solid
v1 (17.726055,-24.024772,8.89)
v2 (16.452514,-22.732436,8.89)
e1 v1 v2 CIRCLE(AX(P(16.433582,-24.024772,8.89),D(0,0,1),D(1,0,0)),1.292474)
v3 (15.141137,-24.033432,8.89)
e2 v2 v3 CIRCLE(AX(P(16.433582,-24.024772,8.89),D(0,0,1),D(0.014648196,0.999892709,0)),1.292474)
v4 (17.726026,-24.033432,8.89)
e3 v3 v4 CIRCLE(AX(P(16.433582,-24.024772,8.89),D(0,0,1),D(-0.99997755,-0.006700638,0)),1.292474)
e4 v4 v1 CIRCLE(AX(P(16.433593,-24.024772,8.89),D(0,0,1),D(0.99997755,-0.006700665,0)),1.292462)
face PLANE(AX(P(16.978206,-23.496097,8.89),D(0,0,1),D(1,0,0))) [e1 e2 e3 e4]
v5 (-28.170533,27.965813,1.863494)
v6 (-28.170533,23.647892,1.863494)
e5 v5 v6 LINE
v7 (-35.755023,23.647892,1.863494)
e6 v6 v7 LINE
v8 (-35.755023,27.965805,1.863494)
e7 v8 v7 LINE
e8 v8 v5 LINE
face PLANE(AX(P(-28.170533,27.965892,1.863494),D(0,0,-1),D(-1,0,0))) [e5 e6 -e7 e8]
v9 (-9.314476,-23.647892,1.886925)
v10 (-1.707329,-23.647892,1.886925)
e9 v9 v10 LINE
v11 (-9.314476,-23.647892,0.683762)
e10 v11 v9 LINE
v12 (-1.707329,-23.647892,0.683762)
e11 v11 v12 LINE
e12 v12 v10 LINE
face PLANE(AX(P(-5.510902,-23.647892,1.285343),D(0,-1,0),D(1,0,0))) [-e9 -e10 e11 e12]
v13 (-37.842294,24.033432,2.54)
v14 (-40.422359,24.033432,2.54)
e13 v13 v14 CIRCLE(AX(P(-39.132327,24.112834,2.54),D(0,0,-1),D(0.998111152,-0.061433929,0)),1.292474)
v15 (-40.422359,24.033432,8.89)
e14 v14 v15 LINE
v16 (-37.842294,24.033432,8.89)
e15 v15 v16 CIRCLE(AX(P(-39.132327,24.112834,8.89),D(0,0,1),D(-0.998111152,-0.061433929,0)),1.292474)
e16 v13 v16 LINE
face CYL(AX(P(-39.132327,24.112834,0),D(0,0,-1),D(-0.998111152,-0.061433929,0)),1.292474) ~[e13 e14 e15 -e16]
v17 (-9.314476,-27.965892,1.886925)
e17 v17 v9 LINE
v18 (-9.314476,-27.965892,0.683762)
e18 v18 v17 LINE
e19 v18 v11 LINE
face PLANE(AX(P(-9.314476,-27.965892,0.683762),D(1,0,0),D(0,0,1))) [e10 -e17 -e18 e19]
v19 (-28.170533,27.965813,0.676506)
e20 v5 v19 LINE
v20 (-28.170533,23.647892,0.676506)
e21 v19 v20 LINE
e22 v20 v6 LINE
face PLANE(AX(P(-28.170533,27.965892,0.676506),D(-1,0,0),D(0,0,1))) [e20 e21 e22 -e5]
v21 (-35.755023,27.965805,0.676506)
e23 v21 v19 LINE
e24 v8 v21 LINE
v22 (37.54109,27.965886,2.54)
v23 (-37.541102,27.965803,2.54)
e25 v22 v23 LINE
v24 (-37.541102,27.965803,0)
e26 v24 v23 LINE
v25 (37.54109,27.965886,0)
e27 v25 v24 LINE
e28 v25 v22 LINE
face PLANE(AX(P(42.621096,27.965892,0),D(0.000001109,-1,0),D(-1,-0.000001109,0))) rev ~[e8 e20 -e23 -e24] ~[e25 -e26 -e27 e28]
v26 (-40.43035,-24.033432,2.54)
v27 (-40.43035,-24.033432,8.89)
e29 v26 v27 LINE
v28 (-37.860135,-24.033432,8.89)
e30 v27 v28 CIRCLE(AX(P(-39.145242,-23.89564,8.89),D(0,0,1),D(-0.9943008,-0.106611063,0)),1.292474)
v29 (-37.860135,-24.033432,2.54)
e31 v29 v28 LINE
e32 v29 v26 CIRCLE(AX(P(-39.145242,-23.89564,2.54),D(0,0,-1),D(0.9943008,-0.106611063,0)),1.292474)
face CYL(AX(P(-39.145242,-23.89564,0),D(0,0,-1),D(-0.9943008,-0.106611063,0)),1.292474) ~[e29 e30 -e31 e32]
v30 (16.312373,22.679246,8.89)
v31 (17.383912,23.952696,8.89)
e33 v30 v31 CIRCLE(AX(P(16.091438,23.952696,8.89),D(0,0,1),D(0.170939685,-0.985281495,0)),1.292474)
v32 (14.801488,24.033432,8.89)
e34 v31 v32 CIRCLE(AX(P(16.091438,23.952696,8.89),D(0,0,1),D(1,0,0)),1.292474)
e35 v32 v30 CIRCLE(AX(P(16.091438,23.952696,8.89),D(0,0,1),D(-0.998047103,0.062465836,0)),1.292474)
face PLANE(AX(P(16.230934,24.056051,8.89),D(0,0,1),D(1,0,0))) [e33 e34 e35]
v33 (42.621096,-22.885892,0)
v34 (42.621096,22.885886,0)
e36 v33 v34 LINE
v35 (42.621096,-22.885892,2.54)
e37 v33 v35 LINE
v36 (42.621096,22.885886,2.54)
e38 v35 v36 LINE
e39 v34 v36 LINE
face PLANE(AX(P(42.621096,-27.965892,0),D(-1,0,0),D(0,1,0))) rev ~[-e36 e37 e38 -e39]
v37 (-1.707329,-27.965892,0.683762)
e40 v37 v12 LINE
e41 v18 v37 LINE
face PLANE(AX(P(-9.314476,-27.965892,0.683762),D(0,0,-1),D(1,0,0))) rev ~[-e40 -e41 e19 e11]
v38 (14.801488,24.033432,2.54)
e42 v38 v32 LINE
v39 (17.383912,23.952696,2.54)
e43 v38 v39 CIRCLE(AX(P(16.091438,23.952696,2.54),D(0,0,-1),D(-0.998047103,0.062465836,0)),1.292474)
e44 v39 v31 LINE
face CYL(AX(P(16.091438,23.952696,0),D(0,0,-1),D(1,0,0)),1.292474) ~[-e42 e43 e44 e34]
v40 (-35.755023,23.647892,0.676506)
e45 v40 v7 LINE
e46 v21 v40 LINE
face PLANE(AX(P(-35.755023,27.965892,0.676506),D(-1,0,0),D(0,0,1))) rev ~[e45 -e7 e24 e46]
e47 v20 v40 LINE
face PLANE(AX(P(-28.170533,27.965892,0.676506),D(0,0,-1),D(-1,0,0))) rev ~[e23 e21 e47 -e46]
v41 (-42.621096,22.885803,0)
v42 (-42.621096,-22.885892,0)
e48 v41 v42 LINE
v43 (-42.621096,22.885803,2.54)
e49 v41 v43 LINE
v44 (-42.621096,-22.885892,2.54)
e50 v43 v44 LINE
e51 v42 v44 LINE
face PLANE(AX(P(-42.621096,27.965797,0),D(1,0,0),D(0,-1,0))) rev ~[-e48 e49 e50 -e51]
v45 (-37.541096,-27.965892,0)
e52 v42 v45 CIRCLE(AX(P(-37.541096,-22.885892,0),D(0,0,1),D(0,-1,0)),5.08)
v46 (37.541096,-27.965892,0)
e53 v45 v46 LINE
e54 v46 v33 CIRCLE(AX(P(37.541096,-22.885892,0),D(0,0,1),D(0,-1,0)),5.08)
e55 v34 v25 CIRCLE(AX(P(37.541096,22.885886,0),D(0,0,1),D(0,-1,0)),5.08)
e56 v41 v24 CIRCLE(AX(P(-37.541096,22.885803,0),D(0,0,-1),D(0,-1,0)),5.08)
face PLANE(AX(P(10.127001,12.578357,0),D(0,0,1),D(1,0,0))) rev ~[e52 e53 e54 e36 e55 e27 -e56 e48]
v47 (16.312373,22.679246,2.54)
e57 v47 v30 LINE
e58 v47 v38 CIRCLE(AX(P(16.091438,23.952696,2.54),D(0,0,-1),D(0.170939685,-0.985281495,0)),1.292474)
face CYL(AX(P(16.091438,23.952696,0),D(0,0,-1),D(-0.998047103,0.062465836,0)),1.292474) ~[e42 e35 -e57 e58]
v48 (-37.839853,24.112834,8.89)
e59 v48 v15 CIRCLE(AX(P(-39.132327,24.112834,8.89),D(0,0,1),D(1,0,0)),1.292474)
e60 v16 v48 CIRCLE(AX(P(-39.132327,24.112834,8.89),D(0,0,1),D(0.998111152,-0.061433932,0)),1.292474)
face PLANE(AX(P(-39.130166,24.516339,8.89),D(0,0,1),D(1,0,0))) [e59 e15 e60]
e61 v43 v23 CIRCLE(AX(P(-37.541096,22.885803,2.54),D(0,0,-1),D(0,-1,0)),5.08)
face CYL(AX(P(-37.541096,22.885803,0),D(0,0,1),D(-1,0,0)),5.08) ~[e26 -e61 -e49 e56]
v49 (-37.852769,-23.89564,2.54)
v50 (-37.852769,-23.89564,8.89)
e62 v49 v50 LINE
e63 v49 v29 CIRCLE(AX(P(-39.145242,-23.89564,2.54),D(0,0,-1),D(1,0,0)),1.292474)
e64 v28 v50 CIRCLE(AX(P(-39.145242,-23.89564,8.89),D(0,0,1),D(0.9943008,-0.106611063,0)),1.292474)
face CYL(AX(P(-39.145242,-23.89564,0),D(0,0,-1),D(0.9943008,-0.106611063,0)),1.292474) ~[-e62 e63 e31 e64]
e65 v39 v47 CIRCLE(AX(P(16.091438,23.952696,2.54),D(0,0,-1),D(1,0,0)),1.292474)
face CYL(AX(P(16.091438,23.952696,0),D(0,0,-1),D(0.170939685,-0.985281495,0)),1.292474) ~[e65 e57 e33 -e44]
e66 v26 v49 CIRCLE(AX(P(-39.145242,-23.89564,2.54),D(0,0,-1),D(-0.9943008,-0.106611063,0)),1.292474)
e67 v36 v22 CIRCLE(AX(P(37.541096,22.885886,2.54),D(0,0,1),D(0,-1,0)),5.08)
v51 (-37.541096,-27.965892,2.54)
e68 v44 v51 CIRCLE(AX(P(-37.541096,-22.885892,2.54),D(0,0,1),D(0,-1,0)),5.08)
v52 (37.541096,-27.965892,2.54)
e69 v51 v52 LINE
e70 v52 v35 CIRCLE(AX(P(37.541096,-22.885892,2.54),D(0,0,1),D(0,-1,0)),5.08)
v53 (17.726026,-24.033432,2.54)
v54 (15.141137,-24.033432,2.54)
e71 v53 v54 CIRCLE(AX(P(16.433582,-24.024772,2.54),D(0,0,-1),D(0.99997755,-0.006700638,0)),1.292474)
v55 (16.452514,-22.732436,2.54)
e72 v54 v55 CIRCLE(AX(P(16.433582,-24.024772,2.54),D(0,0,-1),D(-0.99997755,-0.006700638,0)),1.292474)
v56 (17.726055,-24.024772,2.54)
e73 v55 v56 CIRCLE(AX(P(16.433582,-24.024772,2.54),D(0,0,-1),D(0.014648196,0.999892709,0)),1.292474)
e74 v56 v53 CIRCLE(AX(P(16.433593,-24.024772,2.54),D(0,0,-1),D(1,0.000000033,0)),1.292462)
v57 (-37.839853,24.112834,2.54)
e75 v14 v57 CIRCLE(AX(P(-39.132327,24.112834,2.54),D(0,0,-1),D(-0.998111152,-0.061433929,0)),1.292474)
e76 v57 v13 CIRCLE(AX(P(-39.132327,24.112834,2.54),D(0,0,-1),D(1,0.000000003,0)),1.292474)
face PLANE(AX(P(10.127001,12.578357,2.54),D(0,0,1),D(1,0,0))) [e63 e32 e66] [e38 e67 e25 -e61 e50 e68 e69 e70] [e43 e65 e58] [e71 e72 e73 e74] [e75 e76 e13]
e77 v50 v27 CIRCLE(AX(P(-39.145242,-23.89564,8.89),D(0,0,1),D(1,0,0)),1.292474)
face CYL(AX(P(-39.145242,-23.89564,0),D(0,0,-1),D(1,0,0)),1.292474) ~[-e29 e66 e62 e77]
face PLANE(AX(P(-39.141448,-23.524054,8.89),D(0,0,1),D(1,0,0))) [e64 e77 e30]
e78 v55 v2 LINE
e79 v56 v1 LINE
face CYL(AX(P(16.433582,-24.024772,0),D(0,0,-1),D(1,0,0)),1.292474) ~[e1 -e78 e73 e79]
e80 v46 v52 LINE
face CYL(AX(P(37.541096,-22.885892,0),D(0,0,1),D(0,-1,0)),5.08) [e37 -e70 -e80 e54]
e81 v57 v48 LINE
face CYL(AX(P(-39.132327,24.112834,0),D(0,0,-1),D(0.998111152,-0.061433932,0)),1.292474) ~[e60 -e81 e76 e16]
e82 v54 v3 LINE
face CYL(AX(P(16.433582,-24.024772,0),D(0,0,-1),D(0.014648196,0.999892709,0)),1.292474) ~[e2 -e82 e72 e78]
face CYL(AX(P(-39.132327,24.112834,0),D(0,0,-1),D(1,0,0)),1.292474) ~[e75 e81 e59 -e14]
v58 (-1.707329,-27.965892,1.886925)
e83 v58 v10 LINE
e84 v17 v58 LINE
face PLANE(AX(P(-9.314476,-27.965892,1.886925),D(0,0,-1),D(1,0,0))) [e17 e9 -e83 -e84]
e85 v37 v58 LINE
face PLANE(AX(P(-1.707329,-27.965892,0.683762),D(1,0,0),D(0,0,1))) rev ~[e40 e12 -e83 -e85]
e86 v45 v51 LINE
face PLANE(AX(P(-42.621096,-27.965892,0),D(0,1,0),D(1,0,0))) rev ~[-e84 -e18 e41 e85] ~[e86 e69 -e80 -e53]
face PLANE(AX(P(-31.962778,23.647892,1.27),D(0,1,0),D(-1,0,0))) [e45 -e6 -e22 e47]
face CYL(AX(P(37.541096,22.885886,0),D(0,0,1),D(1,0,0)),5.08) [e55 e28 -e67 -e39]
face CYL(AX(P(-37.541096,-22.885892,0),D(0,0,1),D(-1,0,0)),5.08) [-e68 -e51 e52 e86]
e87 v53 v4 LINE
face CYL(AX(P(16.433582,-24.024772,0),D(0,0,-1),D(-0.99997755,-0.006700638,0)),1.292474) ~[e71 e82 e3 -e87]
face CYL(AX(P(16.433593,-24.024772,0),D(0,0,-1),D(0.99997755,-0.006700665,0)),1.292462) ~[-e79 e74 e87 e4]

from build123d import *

# Parameters (mm, degrees)
F1_DEPTH = 2.54
F2_R     = 5.08
F3_DEPTH = 8.89
F5_W     = 7.6071470976
F5_H     = 1.2031628285
F6_DEPTH = 4.318
F7_W     = 7.584489882
F7_H     = 1.1869876339
F8_DEPTH = 4.318


# Not quite as in the source:
# - ends of sketch curves that miss each other by under 0.0002 mm in the source are joined


with BuildPart() as f1:
    # F0 (on Top) → F1 (new body)
    with BuildSketch(Plane.XY):
        with BuildLine():
            Line((-42.6210959934, 27.9657971114), (-42.6210959934, 24.0334319246))
            Line((-42.6210959934, 24.0334319246), (-40.4223592815, 24.0334319246))
            ThreePointArc((-40.4223592815, 24.0334319246), (-39.1720464715, 25.4046969243), (-37.8398531152, 24.1128336638))
            ThreePointArc((-37.8398531152, 24.1128336638), (-37.8404635808, 24.0731140337), (-37.8422944012, 24.0334319246))
            Line((-37.8422944012, 24.0334319246), (14.8014883525, 24.0334319246))
            ThreePointArc((14.8014883525, 24.0334319246), (16.1318254594, 25.2445390274), (17.3839117365, 23.9526964724))
            ThreePointArc((17.3839117365, 23.9526964724), (17.080387221, 23.1205499759), (16.312373062, 22.6792460274))
            Line((16.312373062, 22.6792460274), (16.4525141181, -22.7324364705))
            ThreePointArc((16.4525141181, -22.7324364705), (17.3541679288, -23.1175729008), (17.726055436, -24.0247715265))
            ThreePointArc((17.726055436, -24.0247715265), (17.7260481822, -24.0291017499), (17.7260264206, -24.0334319246))
            Line((17.7260264206, -24.0334319246), (42.6210959934, -24.0334319246))
            Line((42.6210959934, -24.0334319246), (42.6210959934, 24.0334319246))
            Line((42.6210959934, 24.0334319246), (42.6210959934, 27.965891646))
            Line((42.6210959934, 27.965891646), (-42.6210959934, 27.9657971114))
        make_face()
        with BuildLine():
            Line((-42.6210959934, 24.0334319246), (-42.6210959934, -24.0334319246))
            Line((-42.6210959934, -24.0334319246), (-40.4303500829, -24.0334319246))
            ThreePointArc((-40.4303500829, -24.0334319246), (-39.2142367954, -22.6050090303), (-37.8527686966, -23.8956399262))
            ThreePointArc((-37.8527686966, -23.8956399262), (-37.8546115269, -23.9646342987), (-37.8601347627, -24.0334319246))
            Line((-37.8601347627, -24.0334319246), (15.1411369991, -24.0334319246))
            ThreePointArc((15.1411369991, -24.0334319246), (15.5233039011, -23.1072298959), (16.4525141181, -22.7324364705))
            Line((16.4525141181, -22.7324364705), (16.312373062, 22.6792460274))
            ThreePointArc((16.312373062, 22.6792460274), (15.2287950262, 22.9902332706), (14.8014883525, 24.0334319246))
            Line((14.8014883525, 24.0334319246), (-37.8422944012, 24.0334319246))
            ThreePointArc((-37.8422944012, 24.0334319246), (-39.1323268414, 22.8203599376), (-40.4223592815, 24.0334319246))
            Line((-40.4223592815, 24.0334319246), (-42.6210959934, 24.0334319246))
        make_face()
        with BuildLine():
            Line((-40.4303500829, -24.0334319246), (-42.6210959934, -24.0334319246))
            Line((-42.6210959934, -24.0334319246), (-42.6210959934, -27.965891646))
            Line((-42.6210959934, -27.965891646), (42.6210959934, -27.965891646))
            Line((42.6210959934, -27.965891646), (42.6210959934, -24.0334319246))
            Line((42.6210959934, -24.0334319246), (17.7260264206, -24.0334319246))
            ThreePointArc((17.7260264206, -24.0334319246), (16.4335817099, -25.3172452526), (15.1411369991, -24.0334319246))
            Line((15.1411369991, -24.0334319246), (-37.8601347627, -24.0334319246))
            ThreePointArc((-37.8601347627, -24.0334319246), (-39.1452424228, -25.1881136524), (-40.4303500829, -24.0334319246))
        make_face()
    extrude(amount=F1_DEPTH)

    # F2
    f2_edges = [f1.edges().sort_by_distance(p)[0] for p in [
        (42.621096, -27.965892, 1.27),
        (-42.621096, -27.965892, 1.27),
        (42.621096, 27.965892, 1.27),
        (-42.621096, 27.965797, 1.27),
    ]]
    fillet(f2_edges, radius=F2_R)

    # F0 (on Top) → F3 (join)
    with BuildSketch(Plane.XY):
        with BuildLine():
            ThreePointArc((-37.8398531152, 24.1128336638), (-39.1720464715, 25.4046969243), (-40.4223592815, 24.0334319246))
            Line((-40.4223592815, 24.0334319246), (-37.8422944012, 24.0334319246))
            ThreePointArc((-37.8422944012, 24.0334319246), (-37.8404635808, 24.0731140337), (-37.8398531152, 24.1128336638))
        make_face()
        with BuildLine():
            Line((-37.8422944012, 24.0334319246), (-40.4223592815, 24.0334319246))
            ThreePointArc((-40.4223592815, 24.0334319246), (-39.1323268414, 22.8203599376), (-37.8422944012, 24.0334319246))
        make_face()
        with BuildLine():
            ThreePointArc((-37.8527686966, -23.8956399262), (-39.2142367954, -22.6050090303), (-40.4303500829, -24.0334319246))
            Line((-40.4303500829, -24.0334319246), (-37.8601347627, -24.0334319246))
            ThreePointArc((-37.8601347627, -24.0334319246), (-37.8546115269, -23.9646342987), (-37.8527686966, -23.8956399262))
        make_face()
        with BuildLine():
            Line((-37.8601347627, -24.0334319246), (-40.4303500829, -24.0334319246))
            ThreePointArc((-40.4303500829, -24.0334319246), (-39.1452424228, -25.1881136524), (-37.8601347627, -24.0334319246))
        make_face()
        with BuildLine():
            ThreePointArc((17.3839117365, 23.9526964724), (16.1318254594, 25.2445390274), (14.8014883525, 24.0334319246))
            Line((14.8014883525, 24.0334319246), (16.3081940264, 24.0334319246))
            Line((16.3081940264, 24.0334319246), (16.312373062, 22.6792460274))
            ThreePointArc((16.312373062, 22.6792460274), (17.080387221, 23.1205499759), (17.3839117365, 23.9526964724))
        make_face()
        with BuildLine():
            Line((16.3081940264, 24.0334319246), (14.8014883525, 24.0334319246))
            ThreePointArc((14.8014883525, 24.0334319246), (15.2287950262, 22.9902332706), (16.312373062, 22.6792460274))
            Line((16.312373062, 22.6792460274), (16.3081940264, 24.0334319246))
        make_face()
        with BuildLine():
            Line((16.4525141181, -22.7324364705), (16.4565290074, -24.0334319246))
            Line((16.4565290074, -24.0334319246), (17.7260264206, -24.0334319246))
            ThreePointArc((17.7260264206, -24.0334319246), (17.7260481822, -24.0291017499), (17.726055436, -24.0247715265))
            ThreePointArc((17.726055436, -24.0247715265), (17.3541679288, -23.1175729008), (16.4525141181, -22.7324364705))
        make_face()
        with BuildLine():
            ThreePointArc((16.4525141181, -22.7324364705), (15.5233039011, -23.1072298959), (15.1411369991, -24.0334319246))
            Line((15.1411369991, -24.0334319246), (16.4565290074, -24.0334319246))
            Line((16.4565290074, -24.0334319246), (16.4525141181, -22.7324364705))
        make_face()
        with BuildLine():
            Line((16.4565290074, -24.0334319246), (15.1411369991, -24.0334319246))
            ThreePointArc((15.1411369991, -24.0334319246), (16.4335817099, -25.3172452526), (17.7260264206, -24.0334319246))
            Line((17.7260264206, -24.0334319246), (16.4565290074, -24.0334319246))
        make_face()
    extrude(amount=F3_DEPTH)

    # F5 (on face) → F6 (cut)
    with BuildSketch(Plane.XZ.offset(27.965891646)):
        with Locations((-5.5109024979, 1.2853431981)):
            Rectangle(F5_W, F5_H)
    extrude(amount=-F6_DEPTH, mode=Mode.SUBTRACT)

    # F7 (on face) → F8 (cut)
    with BuildSketch(Plane(origin=(0, 27.965891646, 0), x_dir=(-1, 0, 0), z_dir=(0, 1, 0))):
        with Locations((31.9627784193, 1.27)):
            Rectangle(F7_W, F7_H)
    extrude(amount=-F8_DEPTH, mode=Mode.SUBTRACT)


solid = f1.part
